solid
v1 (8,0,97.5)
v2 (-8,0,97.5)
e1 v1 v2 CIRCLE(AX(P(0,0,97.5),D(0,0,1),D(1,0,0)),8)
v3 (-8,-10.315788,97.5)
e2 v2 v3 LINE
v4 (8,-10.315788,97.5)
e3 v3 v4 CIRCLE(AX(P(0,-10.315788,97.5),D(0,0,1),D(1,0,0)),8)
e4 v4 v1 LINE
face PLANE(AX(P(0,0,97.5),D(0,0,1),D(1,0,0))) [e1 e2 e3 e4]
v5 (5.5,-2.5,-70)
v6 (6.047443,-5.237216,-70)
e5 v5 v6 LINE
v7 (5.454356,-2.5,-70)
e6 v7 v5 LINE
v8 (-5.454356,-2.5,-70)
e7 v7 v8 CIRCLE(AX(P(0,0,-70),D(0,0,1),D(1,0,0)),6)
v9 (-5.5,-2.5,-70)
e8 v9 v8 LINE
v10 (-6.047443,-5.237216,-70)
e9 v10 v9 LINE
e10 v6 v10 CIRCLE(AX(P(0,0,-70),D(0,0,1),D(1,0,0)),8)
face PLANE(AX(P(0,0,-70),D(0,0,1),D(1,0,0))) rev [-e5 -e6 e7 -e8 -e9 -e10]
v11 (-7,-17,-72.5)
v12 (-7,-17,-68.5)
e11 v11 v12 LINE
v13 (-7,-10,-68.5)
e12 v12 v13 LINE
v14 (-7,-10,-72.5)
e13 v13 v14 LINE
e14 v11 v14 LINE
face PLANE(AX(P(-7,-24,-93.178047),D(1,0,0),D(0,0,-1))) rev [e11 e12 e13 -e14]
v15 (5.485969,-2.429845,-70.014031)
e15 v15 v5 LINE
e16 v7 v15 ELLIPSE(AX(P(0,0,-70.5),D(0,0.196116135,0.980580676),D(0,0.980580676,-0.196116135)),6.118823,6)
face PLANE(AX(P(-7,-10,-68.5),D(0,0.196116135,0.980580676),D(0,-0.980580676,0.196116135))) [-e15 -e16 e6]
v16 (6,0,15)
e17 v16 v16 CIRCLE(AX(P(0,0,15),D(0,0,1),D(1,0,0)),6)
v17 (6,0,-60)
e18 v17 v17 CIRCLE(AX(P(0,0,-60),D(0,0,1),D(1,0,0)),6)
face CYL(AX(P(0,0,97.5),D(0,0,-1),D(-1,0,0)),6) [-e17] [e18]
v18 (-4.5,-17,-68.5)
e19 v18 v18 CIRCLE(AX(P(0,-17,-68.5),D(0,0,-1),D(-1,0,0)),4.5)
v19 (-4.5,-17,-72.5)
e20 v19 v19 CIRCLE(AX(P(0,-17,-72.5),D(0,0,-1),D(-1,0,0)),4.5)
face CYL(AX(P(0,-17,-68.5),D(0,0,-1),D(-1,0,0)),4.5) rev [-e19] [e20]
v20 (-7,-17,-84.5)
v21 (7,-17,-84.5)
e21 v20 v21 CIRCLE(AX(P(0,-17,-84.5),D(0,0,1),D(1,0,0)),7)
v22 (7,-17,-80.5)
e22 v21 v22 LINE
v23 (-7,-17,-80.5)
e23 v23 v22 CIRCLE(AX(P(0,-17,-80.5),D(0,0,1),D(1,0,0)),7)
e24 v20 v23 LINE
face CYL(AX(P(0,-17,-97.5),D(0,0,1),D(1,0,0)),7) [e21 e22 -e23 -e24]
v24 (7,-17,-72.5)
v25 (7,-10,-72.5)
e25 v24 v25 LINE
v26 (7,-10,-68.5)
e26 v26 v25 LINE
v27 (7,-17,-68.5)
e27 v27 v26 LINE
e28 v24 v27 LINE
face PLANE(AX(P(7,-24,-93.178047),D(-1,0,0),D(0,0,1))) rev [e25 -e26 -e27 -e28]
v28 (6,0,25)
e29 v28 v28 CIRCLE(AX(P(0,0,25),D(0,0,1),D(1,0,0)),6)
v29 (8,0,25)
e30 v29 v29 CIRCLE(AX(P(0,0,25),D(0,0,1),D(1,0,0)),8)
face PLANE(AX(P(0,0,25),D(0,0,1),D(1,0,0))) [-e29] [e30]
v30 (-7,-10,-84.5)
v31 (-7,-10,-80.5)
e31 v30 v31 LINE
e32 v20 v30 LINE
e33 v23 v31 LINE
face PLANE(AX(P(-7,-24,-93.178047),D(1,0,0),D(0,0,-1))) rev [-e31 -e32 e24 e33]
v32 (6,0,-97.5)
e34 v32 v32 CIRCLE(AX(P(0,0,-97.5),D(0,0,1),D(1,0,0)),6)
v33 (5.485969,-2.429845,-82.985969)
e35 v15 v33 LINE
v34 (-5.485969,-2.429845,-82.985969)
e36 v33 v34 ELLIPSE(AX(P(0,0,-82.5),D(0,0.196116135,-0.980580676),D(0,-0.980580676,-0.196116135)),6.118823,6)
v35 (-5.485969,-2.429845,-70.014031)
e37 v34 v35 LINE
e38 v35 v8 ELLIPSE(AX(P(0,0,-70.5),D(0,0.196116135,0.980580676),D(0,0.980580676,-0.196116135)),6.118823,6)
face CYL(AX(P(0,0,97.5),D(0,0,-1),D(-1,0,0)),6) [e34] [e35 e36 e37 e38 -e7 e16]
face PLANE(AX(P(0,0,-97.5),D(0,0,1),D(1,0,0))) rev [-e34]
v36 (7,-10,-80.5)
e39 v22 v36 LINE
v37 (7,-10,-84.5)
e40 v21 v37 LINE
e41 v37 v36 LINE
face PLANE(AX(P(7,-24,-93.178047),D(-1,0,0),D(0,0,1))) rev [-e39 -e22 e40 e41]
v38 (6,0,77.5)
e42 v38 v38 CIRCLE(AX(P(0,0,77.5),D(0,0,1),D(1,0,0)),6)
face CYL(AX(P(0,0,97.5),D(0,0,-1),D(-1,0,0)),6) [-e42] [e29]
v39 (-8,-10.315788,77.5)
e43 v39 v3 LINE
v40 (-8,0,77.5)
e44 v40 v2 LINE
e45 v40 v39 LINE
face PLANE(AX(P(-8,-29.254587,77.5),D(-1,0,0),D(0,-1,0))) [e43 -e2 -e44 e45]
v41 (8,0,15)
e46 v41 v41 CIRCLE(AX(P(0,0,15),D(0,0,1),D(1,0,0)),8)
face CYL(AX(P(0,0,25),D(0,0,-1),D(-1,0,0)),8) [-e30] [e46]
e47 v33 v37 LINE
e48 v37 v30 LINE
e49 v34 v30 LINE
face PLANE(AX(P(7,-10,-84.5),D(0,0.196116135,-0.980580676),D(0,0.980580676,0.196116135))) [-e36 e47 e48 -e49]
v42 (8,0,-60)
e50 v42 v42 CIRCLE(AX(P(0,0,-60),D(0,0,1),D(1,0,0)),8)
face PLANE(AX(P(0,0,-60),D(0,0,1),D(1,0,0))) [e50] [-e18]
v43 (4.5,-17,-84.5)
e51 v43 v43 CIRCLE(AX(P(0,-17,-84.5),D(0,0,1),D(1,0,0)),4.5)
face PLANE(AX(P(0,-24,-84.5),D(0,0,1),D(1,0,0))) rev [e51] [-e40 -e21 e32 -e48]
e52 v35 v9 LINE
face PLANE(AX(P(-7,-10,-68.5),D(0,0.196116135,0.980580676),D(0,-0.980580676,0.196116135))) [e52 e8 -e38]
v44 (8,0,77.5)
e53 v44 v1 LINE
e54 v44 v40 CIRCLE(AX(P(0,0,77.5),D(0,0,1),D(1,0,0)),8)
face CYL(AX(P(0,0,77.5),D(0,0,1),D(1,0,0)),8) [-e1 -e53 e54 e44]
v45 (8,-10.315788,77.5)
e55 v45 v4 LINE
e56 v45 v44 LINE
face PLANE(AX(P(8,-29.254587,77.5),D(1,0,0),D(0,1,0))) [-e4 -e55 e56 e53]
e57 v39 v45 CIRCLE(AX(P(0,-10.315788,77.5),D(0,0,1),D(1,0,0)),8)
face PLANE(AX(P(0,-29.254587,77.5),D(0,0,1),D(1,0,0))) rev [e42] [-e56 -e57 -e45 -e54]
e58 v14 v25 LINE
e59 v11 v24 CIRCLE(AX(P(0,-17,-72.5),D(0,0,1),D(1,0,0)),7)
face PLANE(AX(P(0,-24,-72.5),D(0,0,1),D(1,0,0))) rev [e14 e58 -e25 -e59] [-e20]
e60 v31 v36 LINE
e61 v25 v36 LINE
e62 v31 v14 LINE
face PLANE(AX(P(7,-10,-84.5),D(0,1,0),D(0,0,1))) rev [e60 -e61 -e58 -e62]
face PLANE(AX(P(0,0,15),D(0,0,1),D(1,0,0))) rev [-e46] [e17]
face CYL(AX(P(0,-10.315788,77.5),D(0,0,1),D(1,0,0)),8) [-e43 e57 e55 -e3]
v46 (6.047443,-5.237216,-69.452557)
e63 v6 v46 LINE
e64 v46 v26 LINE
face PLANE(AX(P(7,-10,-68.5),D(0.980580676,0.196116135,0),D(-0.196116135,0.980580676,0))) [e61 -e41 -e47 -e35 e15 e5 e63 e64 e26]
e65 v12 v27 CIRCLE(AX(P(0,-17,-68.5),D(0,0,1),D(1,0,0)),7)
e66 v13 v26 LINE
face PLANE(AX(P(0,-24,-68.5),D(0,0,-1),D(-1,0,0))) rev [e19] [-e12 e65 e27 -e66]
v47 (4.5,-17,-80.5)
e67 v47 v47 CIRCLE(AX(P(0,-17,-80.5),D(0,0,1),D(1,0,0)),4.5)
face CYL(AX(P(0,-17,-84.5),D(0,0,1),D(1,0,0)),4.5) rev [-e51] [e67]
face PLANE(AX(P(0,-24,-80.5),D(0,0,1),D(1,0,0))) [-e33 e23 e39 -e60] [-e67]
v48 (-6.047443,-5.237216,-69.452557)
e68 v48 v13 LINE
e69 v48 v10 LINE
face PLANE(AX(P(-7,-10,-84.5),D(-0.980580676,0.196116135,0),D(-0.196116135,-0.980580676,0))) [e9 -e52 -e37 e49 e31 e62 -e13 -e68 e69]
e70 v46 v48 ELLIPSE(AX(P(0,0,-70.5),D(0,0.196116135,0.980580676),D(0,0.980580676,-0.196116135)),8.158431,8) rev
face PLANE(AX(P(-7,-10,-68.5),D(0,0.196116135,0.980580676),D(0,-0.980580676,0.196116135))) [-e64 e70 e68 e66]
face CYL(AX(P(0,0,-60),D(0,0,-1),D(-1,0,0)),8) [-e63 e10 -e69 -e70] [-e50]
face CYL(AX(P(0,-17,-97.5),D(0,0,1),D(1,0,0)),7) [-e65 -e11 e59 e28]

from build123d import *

# Parameters (mm, degrees)
SKETCH1_R           = 6
BOSS_EXTRUDE1_DEPTH = 97.5
SKETCH4_W           = 14
SKETCH4_H           = 4
BOSS_EXTRUDE2_DEPTH = 14
SKETCH5_R           = 4.5
CUT_EXTRUDE1_DEPTH  = 4
CUT_EXTRUDE2_START  = -4
SKETCH6_R           = 4.5
CUT_EXTRUDE2_DEPTH  = 4
CUT_EXTRUDE3_DEPTH  = 168.871975132
SKETCH8_R           = 8
BOSS_EXTRUDE3_DEPTH = 5
SKETCH9_R           = 6
BOSS_EXTRUDE4_DEPTH = 20
BOSS_EXTRUDE5_START = 10
SKETCH11_R          = 8
BOSS_EXTRUDE5_DEPTH = 10


with BuildPart() as part:
    # Sketch1 → Boss-Extrude1 (new, symmetric)
    with BuildSketch(Plane.XY):
        Circle(SKETCH1_R)
    extrude(amount=BOSS_EXTRUDE1_DEPTH, both=True)

    # Sketch2 → Loft1 section 0
    with BuildSketch(Plane(origin=(0, 0, 0), x_dir=(1, 0, 0), z_dir=(0, 1, 0))):
        with BuildLine():
            Line((-5, 82.5), (5, 82.5))
            Line((5, 82.5), (5, 70.5))
            Line((5, 70.5), (-5, 70.5))
            Line((-5, 70.5), (-5, 82.5))
        make_face()
    # Sketch3 → Loft1 section 1
    with BuildSketch(Plane(origin=(0, -10, 0), x_dir=(-1, 0, 0), z_dir=(0, 1, 0))):
        with BuildLine():
            Line((-7, -68.5), (7, -68.5))
            Line((7, -68.5), (7, -84.5))
            Line((7, -84.5), (-7, -84.5))
            Line((-7, -84.5), (-7, -68.5))
        make_face()
    loft()

    # Sketch4 → Boss-Extrude2 (add)
    with BuildSketch(Plane.XZ.offset(10)):
        with Locations((0, -70.5)):
            Rectangle(SKETCH4_W, SKETCH4_H)
        with Locations((0, -82.5)):
            Rectangle(SKETCH4_W, SKETCH4_H)
    extrude(amount=BOSS_EXTRUDE2_DEPTH)

    # Sketch5 → Cut-Extrude1 (cut)
    with BuildSketch(Plane(origin=(0, 0, -72.5), x_dir=(-1, 0, 0), z_dir=(0, 0, -1))):
        with Locations((0, -17)):
            Circle(SKETCH5_R)
    extrude(amount=-CUT_EXTRUDE1_DEPTH, mode=Mode.SUBTRACT)

    # Sketch6 → Cut-Extrude2 (cut)
    with BuildSketch(Plane.XY.offset(-80.5).offset(CUT_EXTRUDE2_START)):
        with Locations((0, -17)):
            Circle(SKETCH6_R)
    extrude(amount=CUT_EXTRUDE2_DEPTH, mode=Mode.SUBTRACT)

    # Sketch7 → Cut-Extrude3 (cut, through all)
    with BuildSketch(Plane.XY.offset(-68.5)):
        with BuildLine():
            ThreePointArc((0, -24), (-4.949747468, -21.949747468), (-7, -17))
            Line((-7, -17), (-7, -24))
            Line((-7, -24), (0, -24))
        make_face()
        with BuildLine():
            ThreePointArc((7, -17), (4.949747468, -21.949747468), (0, -24))
            Line((0, -24), (7, -24))
            Line((7, -24), (7, -17))
        make_face()
    extrude(amount=-CUT_EXTRUDE3_DEPTH, mode=Mode.SUBTRACT)

    # Sketch8 → Boss-Extrude3 (add, symmetric)
    with BuildSketch(Plane.XY.offset(-65)):
        Circle(SKETCH8_R)
    extrude(amount=BOSS_EXTRUDE3_DEPTH, both=True)

    # Sketch9 → Boss-Extrude4 (add)
    with BuildSketch(Plane.XY.offset(97.5)):
        with BuildLine():
            Line((8, -10.315788333), (8, 0))
            ThreePointArc((8, 0), (0, 8), (-8, 0))
            Line((-8, 0), (-8, -10.315788333))
            ThreePointArc((-8, -10.315788333), (0, -18.315788333), (8, -10.315788333))
        make_face()
        Circle(SKETCH9_R, mode=Mode.SUBTRACT)
    extrude(amount=-BOSS_EXTRUDE4_DEPTH)

    # Sketch11 → Boss-Extrude5 (add)
    with BuildSketch(Plane.XY.offset(15).offset(BOSS_EXTRUDE5_START)):
        Circle(SKETCH11_R)
    extrude(amount=-BOSS_EXTRUDE5_DEPTH)


solid = part.part
